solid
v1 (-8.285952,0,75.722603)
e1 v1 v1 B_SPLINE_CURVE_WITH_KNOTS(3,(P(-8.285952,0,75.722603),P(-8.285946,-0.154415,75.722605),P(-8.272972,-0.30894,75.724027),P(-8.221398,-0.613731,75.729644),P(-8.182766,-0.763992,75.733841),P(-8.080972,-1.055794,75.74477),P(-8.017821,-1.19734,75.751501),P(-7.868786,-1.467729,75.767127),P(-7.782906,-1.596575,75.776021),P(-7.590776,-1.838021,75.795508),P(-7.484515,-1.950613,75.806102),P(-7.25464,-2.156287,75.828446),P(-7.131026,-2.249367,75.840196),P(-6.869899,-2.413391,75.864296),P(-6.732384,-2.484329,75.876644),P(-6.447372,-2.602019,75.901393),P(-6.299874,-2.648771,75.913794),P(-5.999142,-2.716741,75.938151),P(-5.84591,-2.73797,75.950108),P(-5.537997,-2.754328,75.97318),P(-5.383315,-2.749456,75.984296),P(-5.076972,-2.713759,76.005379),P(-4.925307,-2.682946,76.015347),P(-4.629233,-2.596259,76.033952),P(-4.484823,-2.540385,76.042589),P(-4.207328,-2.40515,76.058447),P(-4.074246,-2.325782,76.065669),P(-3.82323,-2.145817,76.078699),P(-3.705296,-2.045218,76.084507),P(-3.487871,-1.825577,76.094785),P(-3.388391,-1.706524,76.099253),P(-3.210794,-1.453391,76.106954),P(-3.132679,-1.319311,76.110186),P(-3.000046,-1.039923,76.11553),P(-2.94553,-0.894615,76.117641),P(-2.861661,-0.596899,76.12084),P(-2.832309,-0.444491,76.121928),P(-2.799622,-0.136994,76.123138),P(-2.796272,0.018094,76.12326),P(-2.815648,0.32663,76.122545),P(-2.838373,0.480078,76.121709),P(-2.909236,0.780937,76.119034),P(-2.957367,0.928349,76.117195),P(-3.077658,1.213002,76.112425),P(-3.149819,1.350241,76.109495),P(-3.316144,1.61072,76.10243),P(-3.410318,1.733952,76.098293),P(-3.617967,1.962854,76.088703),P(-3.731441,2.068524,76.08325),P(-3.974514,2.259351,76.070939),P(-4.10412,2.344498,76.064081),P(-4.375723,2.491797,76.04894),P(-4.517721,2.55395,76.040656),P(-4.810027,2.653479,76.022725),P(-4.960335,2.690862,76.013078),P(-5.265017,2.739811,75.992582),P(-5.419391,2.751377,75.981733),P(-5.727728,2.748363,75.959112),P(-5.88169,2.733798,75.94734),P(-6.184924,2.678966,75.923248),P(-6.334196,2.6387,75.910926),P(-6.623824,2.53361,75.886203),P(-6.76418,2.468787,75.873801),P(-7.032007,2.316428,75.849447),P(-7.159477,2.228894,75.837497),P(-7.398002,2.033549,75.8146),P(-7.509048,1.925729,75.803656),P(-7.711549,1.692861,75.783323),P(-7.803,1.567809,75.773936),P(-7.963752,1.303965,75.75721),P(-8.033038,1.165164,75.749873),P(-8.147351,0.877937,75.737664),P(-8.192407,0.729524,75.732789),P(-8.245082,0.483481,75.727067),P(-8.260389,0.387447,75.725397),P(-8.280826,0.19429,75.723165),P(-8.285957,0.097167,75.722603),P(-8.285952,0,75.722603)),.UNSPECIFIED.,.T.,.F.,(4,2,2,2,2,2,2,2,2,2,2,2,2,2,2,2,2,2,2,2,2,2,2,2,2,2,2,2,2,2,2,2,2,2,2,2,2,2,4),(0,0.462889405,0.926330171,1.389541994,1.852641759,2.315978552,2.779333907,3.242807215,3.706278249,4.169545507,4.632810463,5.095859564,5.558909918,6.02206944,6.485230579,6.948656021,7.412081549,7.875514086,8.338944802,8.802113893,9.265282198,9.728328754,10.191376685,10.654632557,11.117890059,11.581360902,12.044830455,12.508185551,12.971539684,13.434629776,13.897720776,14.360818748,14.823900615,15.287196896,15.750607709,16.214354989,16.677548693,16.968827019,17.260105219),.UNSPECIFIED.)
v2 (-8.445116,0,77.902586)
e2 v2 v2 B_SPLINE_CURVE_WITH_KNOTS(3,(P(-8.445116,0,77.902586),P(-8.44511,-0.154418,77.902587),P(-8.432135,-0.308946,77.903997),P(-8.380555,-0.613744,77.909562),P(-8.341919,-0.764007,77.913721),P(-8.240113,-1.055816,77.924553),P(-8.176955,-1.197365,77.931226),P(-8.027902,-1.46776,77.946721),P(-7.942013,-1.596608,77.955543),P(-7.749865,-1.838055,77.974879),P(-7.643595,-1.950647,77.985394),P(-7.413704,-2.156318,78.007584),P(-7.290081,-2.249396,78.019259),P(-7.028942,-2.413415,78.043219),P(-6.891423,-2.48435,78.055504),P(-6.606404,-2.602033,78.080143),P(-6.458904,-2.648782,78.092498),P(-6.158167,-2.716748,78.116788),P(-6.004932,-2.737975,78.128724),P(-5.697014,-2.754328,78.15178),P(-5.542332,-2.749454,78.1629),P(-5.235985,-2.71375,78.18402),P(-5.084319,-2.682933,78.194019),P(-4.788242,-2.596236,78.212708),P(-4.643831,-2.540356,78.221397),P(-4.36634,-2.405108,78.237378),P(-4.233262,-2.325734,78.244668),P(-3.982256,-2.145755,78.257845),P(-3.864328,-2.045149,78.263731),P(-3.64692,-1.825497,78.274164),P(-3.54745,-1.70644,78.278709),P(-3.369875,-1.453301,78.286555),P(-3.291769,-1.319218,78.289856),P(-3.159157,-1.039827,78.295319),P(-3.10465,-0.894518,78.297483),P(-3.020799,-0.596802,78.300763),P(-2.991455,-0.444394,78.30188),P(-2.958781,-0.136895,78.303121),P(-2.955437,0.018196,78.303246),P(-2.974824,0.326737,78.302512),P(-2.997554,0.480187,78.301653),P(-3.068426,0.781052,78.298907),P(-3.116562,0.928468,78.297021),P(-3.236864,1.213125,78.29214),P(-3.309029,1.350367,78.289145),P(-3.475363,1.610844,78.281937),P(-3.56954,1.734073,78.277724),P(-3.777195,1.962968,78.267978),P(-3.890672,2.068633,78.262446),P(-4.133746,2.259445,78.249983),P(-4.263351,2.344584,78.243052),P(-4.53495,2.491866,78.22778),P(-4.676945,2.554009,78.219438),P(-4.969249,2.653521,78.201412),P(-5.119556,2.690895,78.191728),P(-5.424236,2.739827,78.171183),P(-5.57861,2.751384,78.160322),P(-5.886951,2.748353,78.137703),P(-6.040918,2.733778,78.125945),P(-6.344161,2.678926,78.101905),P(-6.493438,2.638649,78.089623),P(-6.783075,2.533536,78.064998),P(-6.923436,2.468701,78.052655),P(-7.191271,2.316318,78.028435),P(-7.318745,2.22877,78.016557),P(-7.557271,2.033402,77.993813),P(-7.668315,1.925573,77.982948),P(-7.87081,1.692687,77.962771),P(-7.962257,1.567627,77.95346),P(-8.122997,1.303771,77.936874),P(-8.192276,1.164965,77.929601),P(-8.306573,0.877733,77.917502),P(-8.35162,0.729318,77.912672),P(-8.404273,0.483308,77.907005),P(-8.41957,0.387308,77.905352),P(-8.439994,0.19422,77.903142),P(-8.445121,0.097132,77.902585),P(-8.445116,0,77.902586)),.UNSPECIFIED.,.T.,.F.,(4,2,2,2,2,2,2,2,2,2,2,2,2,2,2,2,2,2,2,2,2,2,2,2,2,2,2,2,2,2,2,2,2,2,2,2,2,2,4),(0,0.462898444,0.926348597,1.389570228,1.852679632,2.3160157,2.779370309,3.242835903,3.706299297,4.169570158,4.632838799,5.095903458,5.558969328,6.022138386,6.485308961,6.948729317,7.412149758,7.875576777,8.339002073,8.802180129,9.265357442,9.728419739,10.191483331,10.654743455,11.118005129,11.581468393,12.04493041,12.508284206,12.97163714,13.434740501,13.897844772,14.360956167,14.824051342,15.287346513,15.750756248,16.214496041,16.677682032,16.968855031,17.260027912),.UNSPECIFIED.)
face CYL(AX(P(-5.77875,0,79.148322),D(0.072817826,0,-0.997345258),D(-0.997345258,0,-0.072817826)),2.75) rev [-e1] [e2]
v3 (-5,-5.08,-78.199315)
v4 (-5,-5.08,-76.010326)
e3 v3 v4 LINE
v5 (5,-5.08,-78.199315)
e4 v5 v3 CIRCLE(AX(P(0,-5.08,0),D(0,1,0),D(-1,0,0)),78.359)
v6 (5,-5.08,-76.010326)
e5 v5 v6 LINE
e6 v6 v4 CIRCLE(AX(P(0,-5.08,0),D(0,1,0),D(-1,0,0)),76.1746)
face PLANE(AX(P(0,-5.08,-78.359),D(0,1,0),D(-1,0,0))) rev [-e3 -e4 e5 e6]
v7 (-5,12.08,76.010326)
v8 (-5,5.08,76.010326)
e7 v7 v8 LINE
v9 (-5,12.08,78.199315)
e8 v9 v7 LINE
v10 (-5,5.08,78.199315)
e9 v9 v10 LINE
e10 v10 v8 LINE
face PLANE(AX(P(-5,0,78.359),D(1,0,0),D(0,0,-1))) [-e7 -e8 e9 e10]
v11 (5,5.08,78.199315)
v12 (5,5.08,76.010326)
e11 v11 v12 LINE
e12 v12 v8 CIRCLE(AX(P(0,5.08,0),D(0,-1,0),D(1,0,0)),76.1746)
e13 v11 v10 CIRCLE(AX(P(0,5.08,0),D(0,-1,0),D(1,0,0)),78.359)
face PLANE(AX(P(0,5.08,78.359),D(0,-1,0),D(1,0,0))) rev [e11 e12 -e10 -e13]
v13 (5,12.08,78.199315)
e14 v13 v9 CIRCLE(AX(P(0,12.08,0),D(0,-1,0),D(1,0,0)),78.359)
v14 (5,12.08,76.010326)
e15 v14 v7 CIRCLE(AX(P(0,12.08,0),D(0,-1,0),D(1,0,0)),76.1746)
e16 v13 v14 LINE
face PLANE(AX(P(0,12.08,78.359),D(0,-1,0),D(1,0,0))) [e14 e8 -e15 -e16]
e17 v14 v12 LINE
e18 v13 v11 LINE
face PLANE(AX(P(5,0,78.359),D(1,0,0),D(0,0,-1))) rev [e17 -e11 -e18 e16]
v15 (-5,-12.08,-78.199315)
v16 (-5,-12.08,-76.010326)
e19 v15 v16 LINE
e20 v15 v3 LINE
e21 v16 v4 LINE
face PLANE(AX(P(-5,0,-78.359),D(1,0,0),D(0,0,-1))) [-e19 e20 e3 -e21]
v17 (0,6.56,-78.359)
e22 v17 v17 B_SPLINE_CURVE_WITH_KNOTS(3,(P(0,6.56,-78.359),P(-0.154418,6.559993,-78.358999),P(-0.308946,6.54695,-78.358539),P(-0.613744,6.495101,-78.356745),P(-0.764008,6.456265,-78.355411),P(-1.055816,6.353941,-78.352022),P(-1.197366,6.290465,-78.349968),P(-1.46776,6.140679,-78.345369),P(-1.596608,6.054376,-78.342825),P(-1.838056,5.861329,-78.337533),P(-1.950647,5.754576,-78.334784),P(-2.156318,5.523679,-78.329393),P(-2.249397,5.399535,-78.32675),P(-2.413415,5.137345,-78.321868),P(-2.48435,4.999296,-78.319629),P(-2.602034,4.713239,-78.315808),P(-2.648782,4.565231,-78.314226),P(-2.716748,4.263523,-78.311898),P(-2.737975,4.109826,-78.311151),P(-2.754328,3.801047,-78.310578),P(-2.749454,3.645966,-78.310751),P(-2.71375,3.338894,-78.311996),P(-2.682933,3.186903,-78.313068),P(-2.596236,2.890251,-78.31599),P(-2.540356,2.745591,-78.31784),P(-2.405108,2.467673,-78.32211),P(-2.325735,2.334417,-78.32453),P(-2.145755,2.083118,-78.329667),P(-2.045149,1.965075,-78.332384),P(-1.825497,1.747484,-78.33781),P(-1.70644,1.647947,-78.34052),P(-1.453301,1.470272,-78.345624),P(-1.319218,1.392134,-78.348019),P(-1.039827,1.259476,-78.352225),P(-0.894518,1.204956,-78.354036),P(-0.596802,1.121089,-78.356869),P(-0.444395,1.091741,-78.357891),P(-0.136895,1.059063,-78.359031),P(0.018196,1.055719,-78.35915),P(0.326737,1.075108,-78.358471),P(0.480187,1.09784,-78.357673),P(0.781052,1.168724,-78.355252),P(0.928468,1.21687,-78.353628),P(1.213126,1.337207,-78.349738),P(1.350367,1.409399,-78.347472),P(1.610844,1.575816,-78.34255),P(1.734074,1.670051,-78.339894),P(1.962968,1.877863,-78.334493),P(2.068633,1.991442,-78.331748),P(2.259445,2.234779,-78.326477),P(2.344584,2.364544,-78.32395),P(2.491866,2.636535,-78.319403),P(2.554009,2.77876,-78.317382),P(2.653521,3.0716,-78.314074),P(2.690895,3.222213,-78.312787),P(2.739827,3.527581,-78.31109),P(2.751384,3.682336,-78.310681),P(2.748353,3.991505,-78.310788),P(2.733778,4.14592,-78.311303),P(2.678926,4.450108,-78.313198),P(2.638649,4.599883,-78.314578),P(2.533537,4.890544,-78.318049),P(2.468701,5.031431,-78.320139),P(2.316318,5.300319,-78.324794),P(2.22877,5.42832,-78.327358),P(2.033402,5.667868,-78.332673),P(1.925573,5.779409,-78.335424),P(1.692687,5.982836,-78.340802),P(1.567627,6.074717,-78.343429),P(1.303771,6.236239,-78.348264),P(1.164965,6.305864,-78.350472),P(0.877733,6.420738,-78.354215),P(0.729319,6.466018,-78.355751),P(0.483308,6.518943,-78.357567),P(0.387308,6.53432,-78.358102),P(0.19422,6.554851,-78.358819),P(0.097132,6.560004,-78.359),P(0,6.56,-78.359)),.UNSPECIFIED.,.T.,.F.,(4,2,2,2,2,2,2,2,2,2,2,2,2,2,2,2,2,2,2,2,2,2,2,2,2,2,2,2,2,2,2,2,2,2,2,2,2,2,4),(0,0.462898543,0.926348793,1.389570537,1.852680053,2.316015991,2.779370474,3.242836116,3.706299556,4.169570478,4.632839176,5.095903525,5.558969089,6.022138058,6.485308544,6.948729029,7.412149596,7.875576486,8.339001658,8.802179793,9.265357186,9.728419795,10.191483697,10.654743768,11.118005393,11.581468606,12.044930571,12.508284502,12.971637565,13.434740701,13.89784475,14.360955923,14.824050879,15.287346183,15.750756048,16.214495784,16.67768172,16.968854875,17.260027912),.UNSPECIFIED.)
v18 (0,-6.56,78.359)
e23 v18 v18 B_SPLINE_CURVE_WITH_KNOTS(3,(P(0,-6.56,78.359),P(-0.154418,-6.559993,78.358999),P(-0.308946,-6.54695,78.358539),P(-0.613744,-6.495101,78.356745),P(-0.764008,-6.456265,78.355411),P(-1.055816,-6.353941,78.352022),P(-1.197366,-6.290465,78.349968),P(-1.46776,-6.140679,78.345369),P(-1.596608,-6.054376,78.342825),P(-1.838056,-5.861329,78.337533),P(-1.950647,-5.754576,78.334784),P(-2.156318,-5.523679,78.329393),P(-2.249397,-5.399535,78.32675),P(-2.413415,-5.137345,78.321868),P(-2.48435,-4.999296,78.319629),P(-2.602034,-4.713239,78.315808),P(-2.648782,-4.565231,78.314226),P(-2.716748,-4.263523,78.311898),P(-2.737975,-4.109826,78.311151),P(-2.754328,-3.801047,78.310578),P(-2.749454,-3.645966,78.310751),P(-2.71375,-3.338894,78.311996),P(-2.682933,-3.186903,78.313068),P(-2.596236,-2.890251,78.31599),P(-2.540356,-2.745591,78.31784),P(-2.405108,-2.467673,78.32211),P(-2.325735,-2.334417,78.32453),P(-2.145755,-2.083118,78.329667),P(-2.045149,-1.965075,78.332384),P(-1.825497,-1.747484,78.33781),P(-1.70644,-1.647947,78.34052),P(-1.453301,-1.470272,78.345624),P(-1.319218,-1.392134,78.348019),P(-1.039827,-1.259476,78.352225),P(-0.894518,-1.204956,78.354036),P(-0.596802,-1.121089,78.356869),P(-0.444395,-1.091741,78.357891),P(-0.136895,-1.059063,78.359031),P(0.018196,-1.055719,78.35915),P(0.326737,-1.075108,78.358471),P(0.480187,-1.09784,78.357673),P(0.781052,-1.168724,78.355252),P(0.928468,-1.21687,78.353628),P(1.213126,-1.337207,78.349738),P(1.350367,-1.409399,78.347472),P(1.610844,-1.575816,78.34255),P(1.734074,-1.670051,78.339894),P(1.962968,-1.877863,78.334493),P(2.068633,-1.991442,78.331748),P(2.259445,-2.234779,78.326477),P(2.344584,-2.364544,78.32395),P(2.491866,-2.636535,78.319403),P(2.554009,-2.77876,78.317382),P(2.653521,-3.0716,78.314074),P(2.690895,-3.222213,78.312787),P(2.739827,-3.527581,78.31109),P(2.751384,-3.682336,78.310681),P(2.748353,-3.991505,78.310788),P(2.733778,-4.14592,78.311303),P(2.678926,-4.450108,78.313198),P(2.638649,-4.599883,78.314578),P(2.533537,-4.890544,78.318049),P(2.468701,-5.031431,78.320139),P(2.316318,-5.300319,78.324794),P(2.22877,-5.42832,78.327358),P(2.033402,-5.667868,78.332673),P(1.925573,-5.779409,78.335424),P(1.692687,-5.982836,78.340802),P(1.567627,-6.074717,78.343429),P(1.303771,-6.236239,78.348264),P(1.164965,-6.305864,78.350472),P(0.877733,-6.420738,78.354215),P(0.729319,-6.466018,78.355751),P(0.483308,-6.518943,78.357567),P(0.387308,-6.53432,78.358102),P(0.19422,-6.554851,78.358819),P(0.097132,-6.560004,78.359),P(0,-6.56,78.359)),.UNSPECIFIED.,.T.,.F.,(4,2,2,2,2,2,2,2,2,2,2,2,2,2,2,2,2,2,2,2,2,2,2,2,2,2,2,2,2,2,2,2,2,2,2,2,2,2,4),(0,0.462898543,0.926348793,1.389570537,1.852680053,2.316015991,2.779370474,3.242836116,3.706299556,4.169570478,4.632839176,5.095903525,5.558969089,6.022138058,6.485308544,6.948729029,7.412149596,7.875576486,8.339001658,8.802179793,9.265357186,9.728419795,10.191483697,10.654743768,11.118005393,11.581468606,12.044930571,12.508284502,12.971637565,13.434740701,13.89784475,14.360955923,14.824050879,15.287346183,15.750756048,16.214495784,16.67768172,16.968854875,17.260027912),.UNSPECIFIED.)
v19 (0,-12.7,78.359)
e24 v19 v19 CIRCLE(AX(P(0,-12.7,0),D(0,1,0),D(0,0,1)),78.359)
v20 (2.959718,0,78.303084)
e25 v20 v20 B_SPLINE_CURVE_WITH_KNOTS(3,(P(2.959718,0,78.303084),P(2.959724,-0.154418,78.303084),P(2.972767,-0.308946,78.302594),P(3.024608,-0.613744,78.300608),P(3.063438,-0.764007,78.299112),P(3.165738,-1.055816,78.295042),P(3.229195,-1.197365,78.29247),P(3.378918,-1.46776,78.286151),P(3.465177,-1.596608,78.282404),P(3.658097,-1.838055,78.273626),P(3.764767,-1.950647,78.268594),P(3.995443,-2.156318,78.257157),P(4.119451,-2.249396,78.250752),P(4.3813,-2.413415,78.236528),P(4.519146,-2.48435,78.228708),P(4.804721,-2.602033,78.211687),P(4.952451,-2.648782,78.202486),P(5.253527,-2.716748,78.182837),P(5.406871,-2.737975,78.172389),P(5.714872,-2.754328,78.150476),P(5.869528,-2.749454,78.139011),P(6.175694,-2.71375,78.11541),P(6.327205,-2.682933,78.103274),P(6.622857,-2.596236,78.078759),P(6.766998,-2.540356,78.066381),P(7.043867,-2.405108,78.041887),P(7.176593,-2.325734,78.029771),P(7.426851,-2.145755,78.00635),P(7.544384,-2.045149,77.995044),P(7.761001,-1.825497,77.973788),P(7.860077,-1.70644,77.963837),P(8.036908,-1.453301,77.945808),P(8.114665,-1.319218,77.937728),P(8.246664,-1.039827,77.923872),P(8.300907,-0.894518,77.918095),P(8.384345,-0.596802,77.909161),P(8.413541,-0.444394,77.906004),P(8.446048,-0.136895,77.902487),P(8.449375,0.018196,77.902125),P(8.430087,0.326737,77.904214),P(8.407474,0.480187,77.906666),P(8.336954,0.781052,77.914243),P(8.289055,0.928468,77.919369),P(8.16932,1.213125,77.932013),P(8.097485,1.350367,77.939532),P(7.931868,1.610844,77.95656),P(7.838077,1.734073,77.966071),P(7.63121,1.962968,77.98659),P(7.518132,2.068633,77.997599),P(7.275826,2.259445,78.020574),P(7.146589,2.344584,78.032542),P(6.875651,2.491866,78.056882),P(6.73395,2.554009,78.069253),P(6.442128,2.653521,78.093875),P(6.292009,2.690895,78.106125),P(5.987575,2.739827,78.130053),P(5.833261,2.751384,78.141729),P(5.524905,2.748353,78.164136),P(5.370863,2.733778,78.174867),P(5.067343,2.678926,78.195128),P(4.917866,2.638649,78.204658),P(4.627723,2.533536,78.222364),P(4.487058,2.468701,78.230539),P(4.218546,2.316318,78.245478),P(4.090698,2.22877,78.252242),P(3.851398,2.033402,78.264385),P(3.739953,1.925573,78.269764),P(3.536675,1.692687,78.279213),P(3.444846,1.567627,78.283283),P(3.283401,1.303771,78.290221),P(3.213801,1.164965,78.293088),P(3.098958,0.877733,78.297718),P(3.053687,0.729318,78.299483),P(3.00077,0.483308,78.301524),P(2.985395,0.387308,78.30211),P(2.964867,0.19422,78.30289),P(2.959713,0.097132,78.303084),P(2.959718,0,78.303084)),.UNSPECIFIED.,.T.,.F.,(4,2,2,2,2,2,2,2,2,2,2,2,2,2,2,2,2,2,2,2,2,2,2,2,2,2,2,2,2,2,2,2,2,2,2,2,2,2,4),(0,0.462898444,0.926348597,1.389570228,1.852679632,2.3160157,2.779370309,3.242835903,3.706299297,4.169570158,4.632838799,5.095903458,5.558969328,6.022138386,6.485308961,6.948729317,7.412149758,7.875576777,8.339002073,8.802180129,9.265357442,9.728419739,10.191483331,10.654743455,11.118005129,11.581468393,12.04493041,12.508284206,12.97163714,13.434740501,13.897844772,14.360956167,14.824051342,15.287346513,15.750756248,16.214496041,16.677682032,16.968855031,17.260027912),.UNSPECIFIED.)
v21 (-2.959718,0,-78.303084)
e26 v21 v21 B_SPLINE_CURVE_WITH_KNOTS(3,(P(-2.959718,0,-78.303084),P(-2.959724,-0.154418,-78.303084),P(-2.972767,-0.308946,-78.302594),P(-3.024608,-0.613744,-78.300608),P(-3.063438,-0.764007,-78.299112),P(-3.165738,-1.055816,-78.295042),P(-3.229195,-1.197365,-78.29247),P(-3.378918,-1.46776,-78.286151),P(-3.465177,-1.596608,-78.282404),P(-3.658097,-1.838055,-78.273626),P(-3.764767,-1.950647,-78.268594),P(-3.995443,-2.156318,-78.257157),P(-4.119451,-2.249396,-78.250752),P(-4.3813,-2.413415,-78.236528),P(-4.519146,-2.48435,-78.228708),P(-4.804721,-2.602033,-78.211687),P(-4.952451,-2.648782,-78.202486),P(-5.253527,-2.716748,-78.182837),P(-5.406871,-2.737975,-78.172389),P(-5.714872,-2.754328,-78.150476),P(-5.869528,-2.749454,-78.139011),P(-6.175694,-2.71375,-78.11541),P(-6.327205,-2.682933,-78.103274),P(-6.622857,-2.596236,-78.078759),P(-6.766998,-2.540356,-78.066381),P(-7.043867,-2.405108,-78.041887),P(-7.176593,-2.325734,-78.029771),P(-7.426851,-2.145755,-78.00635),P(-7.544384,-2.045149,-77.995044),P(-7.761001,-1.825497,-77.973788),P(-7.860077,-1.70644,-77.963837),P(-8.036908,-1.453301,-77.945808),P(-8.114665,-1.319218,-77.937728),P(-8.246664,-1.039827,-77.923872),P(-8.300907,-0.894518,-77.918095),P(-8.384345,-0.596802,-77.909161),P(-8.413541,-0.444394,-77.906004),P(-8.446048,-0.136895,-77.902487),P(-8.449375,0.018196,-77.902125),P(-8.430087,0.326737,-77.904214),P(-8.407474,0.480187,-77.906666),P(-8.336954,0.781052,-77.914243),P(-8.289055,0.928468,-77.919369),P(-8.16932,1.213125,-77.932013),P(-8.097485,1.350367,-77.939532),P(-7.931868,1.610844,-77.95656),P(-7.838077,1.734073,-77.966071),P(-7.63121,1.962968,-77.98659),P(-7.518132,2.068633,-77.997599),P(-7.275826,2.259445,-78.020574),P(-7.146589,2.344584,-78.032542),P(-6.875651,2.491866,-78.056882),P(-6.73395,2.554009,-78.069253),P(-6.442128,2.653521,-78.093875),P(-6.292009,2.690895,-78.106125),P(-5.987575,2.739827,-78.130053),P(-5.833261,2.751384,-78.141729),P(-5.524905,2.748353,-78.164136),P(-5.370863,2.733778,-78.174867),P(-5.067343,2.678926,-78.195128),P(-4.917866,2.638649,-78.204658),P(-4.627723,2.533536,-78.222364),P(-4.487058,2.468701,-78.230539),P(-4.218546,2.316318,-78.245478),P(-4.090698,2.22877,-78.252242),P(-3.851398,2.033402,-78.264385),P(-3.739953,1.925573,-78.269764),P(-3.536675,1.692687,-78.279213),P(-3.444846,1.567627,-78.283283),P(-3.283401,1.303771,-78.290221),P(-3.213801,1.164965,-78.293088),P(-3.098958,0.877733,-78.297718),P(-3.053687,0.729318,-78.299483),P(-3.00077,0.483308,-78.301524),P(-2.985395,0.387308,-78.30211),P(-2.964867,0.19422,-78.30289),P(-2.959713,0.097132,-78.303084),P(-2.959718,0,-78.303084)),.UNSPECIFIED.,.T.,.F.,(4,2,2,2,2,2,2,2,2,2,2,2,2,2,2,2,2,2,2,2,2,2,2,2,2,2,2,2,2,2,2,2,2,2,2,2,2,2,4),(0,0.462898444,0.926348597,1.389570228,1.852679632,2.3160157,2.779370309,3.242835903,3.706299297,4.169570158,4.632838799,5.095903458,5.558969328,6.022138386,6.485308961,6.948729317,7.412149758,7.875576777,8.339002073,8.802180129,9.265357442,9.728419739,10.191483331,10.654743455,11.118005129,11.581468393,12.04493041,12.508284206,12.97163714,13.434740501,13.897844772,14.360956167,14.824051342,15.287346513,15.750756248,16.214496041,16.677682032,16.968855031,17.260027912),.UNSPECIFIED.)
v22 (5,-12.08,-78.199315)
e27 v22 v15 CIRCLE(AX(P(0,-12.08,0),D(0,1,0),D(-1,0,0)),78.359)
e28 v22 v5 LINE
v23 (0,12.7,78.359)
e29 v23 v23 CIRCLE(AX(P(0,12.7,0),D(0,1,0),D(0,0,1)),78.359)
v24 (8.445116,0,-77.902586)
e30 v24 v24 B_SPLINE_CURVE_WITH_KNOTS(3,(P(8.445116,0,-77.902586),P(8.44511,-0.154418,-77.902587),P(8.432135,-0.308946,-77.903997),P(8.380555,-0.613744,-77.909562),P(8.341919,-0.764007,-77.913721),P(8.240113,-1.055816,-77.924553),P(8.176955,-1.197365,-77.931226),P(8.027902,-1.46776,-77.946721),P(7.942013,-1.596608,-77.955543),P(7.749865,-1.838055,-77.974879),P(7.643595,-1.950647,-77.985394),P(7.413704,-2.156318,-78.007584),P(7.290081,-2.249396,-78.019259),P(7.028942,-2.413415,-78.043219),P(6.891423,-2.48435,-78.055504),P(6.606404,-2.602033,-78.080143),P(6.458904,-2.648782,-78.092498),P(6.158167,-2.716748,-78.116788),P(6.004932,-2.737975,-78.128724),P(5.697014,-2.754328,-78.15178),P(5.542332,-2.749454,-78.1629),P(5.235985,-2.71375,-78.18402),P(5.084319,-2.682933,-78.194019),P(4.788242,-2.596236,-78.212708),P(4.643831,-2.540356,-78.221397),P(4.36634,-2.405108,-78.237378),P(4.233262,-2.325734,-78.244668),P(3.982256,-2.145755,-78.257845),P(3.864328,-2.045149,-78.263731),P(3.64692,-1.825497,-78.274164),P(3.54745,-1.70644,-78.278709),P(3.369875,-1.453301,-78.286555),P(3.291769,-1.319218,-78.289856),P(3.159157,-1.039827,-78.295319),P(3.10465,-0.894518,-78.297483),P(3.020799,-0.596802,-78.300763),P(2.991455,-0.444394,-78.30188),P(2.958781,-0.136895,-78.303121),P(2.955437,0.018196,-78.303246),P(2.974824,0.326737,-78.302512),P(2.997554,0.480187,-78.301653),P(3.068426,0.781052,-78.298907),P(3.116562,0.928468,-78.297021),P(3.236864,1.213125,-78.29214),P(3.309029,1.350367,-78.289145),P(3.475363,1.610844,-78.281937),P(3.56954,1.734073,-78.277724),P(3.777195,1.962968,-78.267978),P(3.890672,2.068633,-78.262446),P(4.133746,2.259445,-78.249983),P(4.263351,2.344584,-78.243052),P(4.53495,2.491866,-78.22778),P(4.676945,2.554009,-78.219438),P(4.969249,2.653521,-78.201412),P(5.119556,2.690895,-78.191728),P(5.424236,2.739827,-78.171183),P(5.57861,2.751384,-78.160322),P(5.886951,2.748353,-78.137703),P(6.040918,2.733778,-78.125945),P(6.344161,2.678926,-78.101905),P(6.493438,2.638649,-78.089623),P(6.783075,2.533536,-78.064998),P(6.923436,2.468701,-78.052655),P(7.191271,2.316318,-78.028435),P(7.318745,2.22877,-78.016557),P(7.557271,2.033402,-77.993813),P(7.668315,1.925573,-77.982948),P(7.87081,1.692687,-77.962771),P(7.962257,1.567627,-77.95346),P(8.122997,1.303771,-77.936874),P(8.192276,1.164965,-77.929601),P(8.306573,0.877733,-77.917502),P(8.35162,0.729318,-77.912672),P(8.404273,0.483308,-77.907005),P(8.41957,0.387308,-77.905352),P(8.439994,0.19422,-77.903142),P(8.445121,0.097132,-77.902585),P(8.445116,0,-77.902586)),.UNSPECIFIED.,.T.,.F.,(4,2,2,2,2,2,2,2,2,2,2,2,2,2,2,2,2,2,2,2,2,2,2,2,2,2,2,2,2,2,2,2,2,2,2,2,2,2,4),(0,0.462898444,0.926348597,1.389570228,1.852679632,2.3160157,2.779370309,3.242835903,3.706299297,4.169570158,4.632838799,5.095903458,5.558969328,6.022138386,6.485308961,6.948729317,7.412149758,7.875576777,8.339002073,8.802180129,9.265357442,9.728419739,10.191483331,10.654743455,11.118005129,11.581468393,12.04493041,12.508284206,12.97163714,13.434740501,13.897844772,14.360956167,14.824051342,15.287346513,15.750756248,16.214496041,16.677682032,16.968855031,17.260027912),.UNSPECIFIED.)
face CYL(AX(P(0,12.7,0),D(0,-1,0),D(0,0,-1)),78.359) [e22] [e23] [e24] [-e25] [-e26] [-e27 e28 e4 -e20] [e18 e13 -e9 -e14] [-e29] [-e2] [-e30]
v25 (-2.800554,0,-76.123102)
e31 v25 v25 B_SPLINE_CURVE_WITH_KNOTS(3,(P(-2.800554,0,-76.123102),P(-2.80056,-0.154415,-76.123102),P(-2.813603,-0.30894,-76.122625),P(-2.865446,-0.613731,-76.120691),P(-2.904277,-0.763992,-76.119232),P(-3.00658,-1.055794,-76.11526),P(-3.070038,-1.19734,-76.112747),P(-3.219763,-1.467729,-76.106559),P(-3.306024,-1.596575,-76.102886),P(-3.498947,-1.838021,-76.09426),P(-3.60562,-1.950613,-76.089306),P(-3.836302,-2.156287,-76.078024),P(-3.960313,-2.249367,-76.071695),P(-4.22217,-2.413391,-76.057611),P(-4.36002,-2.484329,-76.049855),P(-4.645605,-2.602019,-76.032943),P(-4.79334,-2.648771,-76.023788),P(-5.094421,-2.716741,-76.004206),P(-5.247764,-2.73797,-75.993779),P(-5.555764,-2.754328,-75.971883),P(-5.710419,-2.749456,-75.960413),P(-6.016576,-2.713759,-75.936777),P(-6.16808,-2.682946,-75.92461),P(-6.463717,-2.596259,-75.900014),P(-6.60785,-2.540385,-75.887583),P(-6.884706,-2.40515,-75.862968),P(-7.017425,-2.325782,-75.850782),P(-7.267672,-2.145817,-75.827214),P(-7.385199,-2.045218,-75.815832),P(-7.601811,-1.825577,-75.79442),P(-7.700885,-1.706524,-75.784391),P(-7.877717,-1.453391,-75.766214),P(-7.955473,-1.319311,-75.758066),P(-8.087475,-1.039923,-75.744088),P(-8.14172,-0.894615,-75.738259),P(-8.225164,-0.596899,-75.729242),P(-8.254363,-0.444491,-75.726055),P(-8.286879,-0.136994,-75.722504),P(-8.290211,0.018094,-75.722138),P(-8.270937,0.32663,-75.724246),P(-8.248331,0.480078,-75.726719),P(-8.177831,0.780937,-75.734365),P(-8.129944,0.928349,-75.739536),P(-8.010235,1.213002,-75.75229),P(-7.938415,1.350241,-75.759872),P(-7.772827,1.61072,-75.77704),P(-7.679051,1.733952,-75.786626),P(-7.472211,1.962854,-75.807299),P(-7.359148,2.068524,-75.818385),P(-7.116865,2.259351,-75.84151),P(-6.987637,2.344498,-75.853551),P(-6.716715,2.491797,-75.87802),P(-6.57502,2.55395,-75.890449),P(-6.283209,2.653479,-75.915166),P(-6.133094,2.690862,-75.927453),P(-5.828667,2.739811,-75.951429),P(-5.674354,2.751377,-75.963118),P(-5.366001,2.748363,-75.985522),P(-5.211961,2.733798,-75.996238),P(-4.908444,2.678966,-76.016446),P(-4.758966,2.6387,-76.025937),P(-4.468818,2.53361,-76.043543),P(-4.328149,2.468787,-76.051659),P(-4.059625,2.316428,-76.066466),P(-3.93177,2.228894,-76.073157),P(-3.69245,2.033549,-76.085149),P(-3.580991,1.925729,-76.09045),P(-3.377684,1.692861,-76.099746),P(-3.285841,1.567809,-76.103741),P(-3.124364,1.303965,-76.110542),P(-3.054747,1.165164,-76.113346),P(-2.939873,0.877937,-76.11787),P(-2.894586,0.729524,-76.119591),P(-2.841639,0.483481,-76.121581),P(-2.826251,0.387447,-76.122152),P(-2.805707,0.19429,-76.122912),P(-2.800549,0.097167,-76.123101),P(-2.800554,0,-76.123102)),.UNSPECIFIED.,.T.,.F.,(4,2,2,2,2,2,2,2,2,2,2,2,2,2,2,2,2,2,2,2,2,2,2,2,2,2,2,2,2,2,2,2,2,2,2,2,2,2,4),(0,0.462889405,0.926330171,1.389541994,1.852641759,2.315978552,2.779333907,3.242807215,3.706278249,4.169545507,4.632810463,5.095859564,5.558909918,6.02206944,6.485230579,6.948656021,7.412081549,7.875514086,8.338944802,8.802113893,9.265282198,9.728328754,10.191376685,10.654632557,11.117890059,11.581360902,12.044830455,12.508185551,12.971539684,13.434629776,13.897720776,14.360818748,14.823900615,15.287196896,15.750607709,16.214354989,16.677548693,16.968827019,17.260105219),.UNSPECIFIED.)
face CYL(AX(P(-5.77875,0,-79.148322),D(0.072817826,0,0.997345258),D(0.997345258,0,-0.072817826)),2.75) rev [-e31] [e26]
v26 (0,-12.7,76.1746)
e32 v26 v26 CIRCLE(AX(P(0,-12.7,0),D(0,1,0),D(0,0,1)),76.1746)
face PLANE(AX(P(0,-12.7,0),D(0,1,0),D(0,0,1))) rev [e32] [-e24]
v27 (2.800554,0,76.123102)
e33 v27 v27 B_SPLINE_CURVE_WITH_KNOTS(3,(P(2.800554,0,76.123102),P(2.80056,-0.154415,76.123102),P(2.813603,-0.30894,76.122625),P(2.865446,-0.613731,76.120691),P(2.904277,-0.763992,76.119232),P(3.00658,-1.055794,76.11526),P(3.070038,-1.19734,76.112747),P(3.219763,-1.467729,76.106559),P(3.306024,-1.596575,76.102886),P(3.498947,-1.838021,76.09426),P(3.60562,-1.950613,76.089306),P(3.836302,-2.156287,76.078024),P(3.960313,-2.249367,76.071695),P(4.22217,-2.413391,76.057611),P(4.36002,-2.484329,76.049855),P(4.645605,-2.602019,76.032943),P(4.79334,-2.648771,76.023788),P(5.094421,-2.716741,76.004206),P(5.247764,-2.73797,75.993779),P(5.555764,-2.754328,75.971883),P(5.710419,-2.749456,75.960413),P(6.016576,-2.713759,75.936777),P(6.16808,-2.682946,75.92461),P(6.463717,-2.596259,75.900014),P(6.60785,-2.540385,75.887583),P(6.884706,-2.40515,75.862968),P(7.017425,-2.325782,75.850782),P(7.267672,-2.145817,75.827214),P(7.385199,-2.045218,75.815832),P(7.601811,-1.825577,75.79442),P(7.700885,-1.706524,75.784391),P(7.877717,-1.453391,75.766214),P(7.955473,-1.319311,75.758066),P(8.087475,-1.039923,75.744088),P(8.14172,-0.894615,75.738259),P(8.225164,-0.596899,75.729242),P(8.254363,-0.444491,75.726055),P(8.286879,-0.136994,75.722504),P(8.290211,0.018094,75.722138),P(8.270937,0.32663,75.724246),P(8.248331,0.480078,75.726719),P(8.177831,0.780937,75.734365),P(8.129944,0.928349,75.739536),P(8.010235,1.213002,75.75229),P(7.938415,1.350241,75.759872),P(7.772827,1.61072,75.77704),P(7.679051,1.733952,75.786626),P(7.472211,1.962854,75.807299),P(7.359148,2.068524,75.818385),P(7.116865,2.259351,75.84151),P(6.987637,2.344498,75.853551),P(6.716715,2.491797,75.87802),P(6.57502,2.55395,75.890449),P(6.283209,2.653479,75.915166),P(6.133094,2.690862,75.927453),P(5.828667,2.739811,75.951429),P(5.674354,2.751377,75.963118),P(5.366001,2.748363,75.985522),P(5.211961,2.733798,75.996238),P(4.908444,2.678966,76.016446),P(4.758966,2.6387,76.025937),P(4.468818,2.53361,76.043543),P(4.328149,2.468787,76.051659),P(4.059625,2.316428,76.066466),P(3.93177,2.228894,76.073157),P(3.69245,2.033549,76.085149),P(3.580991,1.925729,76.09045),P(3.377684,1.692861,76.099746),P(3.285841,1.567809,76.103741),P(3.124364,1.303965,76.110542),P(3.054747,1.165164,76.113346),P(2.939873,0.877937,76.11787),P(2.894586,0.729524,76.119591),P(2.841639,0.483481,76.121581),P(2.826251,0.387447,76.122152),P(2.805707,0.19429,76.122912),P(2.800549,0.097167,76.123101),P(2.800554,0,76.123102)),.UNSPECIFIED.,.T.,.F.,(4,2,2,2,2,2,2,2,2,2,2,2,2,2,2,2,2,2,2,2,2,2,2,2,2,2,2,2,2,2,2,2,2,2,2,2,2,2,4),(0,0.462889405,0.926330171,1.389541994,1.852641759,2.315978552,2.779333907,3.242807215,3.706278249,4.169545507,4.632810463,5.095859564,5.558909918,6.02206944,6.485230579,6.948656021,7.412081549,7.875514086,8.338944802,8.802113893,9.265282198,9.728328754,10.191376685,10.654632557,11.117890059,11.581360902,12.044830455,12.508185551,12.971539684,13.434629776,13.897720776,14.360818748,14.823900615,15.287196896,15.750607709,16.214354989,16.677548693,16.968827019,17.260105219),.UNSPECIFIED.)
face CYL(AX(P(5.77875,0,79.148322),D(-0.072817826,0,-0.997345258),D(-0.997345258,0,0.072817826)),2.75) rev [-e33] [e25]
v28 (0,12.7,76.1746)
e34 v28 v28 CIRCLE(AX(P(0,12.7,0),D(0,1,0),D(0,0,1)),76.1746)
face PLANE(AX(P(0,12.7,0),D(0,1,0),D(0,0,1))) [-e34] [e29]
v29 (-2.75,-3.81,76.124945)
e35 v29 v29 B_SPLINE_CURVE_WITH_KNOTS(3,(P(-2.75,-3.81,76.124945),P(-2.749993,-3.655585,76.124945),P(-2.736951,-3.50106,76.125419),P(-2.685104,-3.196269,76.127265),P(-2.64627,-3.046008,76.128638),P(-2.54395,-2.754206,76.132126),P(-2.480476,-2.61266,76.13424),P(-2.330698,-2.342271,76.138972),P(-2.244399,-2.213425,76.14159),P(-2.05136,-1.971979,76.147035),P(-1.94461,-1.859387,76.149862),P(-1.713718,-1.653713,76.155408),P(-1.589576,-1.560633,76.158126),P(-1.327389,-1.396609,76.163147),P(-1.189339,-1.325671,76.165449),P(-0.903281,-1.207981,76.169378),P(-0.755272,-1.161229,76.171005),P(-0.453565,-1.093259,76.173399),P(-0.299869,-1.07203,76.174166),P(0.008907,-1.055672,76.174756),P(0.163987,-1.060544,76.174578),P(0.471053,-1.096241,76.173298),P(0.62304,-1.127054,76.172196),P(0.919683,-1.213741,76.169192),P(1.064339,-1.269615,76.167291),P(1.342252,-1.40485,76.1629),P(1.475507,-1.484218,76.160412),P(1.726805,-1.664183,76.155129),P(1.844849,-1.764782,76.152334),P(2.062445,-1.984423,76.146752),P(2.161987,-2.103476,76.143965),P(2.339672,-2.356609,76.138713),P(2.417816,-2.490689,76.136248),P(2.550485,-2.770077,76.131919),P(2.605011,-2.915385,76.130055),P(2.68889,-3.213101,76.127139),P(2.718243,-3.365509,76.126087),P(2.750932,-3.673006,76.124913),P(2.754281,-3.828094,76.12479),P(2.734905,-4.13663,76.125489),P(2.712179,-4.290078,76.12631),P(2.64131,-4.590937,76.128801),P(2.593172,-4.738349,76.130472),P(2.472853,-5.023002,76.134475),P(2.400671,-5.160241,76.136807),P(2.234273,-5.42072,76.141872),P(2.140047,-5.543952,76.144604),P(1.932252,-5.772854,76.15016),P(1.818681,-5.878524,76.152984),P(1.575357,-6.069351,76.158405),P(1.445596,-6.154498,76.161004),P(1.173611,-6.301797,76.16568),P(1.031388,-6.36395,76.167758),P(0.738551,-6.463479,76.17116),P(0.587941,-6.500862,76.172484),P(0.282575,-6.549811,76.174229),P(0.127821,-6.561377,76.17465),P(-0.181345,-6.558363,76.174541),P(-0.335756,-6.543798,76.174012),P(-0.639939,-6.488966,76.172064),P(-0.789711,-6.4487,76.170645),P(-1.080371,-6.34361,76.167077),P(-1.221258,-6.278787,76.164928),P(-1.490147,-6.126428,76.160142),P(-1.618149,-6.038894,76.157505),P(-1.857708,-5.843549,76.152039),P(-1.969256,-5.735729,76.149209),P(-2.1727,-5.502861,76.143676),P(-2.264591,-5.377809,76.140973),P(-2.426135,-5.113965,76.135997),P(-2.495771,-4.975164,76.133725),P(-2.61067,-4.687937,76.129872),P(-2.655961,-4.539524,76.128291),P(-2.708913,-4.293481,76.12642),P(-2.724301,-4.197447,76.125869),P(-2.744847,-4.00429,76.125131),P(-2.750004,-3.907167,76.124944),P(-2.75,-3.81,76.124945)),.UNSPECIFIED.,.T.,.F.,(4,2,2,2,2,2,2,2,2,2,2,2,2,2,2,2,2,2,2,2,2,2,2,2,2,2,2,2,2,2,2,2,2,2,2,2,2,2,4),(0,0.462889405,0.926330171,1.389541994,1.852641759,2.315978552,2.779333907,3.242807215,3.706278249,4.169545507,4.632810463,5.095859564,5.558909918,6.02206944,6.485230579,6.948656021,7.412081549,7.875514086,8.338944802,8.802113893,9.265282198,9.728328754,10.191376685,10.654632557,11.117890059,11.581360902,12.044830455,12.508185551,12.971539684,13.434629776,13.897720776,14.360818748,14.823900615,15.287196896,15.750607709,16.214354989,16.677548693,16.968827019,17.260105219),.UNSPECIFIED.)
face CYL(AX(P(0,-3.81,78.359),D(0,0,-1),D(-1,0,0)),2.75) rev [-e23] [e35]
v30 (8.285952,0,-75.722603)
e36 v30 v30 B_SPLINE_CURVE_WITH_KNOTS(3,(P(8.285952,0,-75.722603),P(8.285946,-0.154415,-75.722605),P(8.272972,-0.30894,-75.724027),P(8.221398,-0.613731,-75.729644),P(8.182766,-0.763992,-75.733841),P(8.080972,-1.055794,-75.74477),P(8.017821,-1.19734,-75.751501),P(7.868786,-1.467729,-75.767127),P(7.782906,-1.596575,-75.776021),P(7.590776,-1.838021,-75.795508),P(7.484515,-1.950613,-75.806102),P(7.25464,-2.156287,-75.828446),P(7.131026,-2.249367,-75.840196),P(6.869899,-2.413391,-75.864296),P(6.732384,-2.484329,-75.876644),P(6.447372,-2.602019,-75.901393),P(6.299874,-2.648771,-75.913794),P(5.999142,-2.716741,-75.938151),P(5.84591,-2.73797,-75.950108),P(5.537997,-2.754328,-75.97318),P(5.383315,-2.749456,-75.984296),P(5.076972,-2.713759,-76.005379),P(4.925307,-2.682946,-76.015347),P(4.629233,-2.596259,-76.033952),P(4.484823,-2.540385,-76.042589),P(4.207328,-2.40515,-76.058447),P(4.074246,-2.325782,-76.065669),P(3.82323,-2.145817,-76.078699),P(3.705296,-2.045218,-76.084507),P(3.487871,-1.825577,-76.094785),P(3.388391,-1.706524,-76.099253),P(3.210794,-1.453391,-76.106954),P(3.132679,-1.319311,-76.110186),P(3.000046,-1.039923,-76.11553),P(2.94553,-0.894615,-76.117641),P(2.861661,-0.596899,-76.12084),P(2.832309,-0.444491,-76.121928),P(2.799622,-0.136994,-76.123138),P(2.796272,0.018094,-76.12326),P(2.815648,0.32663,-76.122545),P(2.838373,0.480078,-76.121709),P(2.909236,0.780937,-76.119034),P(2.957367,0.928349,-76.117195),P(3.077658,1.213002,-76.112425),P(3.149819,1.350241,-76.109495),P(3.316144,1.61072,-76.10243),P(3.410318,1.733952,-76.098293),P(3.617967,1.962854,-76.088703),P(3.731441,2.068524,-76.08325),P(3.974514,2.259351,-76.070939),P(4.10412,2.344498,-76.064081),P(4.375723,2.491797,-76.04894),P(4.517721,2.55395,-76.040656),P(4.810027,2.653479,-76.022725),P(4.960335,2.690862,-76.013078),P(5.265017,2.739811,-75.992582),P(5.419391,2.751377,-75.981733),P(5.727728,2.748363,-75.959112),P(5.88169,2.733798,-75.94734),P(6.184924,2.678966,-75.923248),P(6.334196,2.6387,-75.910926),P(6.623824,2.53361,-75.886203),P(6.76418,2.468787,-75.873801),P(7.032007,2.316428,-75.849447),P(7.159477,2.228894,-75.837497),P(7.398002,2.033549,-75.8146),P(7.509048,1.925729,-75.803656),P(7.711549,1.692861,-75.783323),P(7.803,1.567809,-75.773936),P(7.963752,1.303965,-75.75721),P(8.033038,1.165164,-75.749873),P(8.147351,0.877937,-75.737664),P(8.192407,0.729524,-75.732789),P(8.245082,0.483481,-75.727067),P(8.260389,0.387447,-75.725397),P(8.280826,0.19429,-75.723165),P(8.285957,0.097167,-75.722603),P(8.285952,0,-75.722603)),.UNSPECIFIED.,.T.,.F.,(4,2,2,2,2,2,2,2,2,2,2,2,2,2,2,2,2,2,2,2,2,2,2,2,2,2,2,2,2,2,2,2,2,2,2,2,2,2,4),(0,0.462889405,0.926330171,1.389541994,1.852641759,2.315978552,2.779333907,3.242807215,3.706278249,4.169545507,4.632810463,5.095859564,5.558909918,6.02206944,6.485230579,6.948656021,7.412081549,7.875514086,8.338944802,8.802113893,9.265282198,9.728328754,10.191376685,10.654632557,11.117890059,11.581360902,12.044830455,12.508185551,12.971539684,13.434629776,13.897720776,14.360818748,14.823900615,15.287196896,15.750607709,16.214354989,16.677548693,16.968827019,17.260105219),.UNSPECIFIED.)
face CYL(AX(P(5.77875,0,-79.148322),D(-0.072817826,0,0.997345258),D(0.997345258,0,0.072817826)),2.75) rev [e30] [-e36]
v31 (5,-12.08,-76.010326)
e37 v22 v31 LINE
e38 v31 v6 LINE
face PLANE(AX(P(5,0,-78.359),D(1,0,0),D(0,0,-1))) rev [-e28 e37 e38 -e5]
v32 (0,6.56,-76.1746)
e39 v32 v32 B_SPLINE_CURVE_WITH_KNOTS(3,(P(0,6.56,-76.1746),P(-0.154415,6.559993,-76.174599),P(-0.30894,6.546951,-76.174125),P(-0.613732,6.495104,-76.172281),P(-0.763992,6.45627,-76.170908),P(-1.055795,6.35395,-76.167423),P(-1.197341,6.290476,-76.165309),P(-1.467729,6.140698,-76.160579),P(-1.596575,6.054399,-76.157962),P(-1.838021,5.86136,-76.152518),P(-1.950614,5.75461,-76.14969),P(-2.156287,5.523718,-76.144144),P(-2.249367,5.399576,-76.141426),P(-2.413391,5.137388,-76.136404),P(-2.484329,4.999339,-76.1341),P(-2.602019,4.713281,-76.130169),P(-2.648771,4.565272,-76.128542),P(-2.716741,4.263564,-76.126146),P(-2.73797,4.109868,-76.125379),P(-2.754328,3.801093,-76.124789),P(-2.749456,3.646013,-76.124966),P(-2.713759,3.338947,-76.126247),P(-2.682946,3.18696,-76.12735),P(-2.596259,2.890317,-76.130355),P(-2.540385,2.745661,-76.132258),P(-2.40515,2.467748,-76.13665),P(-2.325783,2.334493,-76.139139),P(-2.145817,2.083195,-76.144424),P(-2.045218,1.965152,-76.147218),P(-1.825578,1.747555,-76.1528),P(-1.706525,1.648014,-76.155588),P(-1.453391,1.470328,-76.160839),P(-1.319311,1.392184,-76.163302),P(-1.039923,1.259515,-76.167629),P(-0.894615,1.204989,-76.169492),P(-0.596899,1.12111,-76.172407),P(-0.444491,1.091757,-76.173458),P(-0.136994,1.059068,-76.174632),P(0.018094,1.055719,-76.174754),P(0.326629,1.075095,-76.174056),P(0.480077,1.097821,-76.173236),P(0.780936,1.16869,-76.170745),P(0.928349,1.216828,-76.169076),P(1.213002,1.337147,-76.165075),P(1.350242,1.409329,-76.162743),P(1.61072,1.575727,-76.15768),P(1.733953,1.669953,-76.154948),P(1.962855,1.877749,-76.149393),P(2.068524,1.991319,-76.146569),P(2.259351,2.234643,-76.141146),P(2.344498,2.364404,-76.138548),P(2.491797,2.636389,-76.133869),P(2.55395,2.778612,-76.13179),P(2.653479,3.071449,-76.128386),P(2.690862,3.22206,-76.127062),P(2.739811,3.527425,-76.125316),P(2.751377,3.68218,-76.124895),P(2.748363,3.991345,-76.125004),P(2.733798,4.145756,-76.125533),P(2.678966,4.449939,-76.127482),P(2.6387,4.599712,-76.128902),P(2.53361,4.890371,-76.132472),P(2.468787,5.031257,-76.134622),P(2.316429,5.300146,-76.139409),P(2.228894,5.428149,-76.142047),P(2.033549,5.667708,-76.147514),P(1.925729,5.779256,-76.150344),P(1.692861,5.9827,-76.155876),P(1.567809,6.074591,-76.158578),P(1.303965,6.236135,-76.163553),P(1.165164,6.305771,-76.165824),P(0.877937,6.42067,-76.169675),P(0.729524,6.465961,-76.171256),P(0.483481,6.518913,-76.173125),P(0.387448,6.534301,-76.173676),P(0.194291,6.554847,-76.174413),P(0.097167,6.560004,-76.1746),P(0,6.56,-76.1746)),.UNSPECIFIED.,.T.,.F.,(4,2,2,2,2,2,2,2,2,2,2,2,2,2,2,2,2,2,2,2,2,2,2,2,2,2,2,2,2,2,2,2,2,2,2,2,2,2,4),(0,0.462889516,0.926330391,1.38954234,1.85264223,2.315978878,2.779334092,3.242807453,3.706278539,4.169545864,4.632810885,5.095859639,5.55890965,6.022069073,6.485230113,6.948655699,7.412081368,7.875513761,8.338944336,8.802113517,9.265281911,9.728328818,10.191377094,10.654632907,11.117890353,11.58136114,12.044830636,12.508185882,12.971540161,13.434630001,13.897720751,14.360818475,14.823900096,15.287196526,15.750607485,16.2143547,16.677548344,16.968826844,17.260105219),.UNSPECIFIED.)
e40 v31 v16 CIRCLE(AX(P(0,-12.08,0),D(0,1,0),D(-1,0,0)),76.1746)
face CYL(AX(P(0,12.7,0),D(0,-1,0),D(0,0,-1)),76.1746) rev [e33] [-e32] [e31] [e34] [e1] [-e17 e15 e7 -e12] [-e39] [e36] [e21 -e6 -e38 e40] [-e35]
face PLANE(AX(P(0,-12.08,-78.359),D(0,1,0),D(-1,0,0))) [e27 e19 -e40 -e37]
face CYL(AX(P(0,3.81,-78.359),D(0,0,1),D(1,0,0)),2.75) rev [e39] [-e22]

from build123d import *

# Parameters (mm, degrees)
SKETCH1_R               = 78.359
SKETCH1_R_2             = 76.1746
BOSS_EXTRUDE1_DEPTH     = 12.7
CUT_SWEEP1_START        = -78.35900006
CUT_SWEEP1_OUTLINE_R    = 2.749999961
CUT_SWEEP1_DEPTH        = 2.234055593
MIRROR2_START           = -78.35900006
MIRROR2_COPY_1_SKETCH_R = 2.749999961
MIRROR2_COPY_1_DEPTH    = 2.234055593
SKETCH18_R              = 2.749999961
SKETCH18_W              = 10.000000066
SKETCH18_H              = 6.99999997
CUT_EXTRUDE1_DEPTH      = 112.54172222
SKETCH18_3_R            = 2.749999961
SKETCH18_3_W            = 10.000000066
SKETCH18_3_H            = 6.99999997
CUT_EXTRUDE2_DEPTH      = 112.541722222


# Read off the part's stored shape, not the designer's step: Cut-Sweep1
with BuildPart() as part:
    # Sketch1 → Boss-Extrude1 (new, symmetric)
    with BuildSketch(Plane(origin=(0, 0, 0), x_dir=(1, 0, 0), z_dir=(0, 1, 0))):
        with Locations(Location((0, 0, 0), (0, 0, 270))):
            Circle(SKETCH1_R)
        with Locations(Location((0, 0, 0), (0, 0, 270))):
            Circle(SKETCH1_R_2, mode=Mode.SUBTRACT)
    extrude(amount=BOSS_EXTRUDE1_DEPTH, both=True)

    # Cut-Sweep1 outline → Cut-Sweep1 (cut)
    with BuildSketch(Plane(origin=(0, 0, 0), x_dir=(0.99734525831366, 0, -0.0728178255598082), z_dir=(0.0728178255598082, 0, 0.99734525831366)).offset(CUT_SWEEP1_START)):
        Circle(CUT_SWEEP1_OUTLINE_R)
    cut_sweep1 = extrude(amount=CUT_SWEEP1_DEPTH, mode=Mode.SUBTRACT)

    # Mirror1: Cut-Sweep1 across plane
    add(cut_sweep1.mirror(Plane(origin=(0, 0, 0), x_dir=(0, 0, 1), z_dir=(1, 0, 0))), mode=Mode.SUBTRACT)

    # Mirror2: Cut-Sweep1 across plane
    add(cut_sweep1.mirror(Plane.XY), mode=Mode.SUBTRACT)

    # Mirror2 copy 1 sketch → Mirror2 copy 1 (cut)
    with BuildSketch(Plane(origin=(0, 0, 0), x_dir=(-0.99734525831366, 0, 0.0728178255598082), z_dir=(-0.0728178255598082, 0, -0.99734525831366)).offset(MIRROR2_START)):
        Circle(MIRROR2_COPY_1_SKETCH_R)
    extrude(amount=MIRROR2_COPY_1_DEPTH, mode=Mode.SUBTRACT)

    # Sketch18 → Cut-Extrude1 (cut, through all)
    with BuildSketch(Plane.XY):
        with Locations(Location((0, 3.81, 0), (0, 0, 90))):
            Circle(SKETCH18_R)
        with Locations((0, -8.579999985)):
            Rectangle(SKETCH18_W, SKETCH18_H)
    extrude(amount=-CUT_EXTRUDE1_DEPTH, mode=Mode.SUBTRACT)

    # Sketch18<3> → Cut-Extrude2 (cut, through all)
    with BuildSketch(Plane.XY):
        with Locations(Location((0, -3.81, 0), (0, 0, 269.999999951))):
            Circle(SKETCH18_3_R)
        with Locations((0, 8.579999985)):
            Rectangle(SKETCH18_3_W, SKETCH18_3_H)
    extrude(amount=CUT_EXTRUDE2_DEPTH, mode=Mode.SUBTRACT)


solid = part.part
